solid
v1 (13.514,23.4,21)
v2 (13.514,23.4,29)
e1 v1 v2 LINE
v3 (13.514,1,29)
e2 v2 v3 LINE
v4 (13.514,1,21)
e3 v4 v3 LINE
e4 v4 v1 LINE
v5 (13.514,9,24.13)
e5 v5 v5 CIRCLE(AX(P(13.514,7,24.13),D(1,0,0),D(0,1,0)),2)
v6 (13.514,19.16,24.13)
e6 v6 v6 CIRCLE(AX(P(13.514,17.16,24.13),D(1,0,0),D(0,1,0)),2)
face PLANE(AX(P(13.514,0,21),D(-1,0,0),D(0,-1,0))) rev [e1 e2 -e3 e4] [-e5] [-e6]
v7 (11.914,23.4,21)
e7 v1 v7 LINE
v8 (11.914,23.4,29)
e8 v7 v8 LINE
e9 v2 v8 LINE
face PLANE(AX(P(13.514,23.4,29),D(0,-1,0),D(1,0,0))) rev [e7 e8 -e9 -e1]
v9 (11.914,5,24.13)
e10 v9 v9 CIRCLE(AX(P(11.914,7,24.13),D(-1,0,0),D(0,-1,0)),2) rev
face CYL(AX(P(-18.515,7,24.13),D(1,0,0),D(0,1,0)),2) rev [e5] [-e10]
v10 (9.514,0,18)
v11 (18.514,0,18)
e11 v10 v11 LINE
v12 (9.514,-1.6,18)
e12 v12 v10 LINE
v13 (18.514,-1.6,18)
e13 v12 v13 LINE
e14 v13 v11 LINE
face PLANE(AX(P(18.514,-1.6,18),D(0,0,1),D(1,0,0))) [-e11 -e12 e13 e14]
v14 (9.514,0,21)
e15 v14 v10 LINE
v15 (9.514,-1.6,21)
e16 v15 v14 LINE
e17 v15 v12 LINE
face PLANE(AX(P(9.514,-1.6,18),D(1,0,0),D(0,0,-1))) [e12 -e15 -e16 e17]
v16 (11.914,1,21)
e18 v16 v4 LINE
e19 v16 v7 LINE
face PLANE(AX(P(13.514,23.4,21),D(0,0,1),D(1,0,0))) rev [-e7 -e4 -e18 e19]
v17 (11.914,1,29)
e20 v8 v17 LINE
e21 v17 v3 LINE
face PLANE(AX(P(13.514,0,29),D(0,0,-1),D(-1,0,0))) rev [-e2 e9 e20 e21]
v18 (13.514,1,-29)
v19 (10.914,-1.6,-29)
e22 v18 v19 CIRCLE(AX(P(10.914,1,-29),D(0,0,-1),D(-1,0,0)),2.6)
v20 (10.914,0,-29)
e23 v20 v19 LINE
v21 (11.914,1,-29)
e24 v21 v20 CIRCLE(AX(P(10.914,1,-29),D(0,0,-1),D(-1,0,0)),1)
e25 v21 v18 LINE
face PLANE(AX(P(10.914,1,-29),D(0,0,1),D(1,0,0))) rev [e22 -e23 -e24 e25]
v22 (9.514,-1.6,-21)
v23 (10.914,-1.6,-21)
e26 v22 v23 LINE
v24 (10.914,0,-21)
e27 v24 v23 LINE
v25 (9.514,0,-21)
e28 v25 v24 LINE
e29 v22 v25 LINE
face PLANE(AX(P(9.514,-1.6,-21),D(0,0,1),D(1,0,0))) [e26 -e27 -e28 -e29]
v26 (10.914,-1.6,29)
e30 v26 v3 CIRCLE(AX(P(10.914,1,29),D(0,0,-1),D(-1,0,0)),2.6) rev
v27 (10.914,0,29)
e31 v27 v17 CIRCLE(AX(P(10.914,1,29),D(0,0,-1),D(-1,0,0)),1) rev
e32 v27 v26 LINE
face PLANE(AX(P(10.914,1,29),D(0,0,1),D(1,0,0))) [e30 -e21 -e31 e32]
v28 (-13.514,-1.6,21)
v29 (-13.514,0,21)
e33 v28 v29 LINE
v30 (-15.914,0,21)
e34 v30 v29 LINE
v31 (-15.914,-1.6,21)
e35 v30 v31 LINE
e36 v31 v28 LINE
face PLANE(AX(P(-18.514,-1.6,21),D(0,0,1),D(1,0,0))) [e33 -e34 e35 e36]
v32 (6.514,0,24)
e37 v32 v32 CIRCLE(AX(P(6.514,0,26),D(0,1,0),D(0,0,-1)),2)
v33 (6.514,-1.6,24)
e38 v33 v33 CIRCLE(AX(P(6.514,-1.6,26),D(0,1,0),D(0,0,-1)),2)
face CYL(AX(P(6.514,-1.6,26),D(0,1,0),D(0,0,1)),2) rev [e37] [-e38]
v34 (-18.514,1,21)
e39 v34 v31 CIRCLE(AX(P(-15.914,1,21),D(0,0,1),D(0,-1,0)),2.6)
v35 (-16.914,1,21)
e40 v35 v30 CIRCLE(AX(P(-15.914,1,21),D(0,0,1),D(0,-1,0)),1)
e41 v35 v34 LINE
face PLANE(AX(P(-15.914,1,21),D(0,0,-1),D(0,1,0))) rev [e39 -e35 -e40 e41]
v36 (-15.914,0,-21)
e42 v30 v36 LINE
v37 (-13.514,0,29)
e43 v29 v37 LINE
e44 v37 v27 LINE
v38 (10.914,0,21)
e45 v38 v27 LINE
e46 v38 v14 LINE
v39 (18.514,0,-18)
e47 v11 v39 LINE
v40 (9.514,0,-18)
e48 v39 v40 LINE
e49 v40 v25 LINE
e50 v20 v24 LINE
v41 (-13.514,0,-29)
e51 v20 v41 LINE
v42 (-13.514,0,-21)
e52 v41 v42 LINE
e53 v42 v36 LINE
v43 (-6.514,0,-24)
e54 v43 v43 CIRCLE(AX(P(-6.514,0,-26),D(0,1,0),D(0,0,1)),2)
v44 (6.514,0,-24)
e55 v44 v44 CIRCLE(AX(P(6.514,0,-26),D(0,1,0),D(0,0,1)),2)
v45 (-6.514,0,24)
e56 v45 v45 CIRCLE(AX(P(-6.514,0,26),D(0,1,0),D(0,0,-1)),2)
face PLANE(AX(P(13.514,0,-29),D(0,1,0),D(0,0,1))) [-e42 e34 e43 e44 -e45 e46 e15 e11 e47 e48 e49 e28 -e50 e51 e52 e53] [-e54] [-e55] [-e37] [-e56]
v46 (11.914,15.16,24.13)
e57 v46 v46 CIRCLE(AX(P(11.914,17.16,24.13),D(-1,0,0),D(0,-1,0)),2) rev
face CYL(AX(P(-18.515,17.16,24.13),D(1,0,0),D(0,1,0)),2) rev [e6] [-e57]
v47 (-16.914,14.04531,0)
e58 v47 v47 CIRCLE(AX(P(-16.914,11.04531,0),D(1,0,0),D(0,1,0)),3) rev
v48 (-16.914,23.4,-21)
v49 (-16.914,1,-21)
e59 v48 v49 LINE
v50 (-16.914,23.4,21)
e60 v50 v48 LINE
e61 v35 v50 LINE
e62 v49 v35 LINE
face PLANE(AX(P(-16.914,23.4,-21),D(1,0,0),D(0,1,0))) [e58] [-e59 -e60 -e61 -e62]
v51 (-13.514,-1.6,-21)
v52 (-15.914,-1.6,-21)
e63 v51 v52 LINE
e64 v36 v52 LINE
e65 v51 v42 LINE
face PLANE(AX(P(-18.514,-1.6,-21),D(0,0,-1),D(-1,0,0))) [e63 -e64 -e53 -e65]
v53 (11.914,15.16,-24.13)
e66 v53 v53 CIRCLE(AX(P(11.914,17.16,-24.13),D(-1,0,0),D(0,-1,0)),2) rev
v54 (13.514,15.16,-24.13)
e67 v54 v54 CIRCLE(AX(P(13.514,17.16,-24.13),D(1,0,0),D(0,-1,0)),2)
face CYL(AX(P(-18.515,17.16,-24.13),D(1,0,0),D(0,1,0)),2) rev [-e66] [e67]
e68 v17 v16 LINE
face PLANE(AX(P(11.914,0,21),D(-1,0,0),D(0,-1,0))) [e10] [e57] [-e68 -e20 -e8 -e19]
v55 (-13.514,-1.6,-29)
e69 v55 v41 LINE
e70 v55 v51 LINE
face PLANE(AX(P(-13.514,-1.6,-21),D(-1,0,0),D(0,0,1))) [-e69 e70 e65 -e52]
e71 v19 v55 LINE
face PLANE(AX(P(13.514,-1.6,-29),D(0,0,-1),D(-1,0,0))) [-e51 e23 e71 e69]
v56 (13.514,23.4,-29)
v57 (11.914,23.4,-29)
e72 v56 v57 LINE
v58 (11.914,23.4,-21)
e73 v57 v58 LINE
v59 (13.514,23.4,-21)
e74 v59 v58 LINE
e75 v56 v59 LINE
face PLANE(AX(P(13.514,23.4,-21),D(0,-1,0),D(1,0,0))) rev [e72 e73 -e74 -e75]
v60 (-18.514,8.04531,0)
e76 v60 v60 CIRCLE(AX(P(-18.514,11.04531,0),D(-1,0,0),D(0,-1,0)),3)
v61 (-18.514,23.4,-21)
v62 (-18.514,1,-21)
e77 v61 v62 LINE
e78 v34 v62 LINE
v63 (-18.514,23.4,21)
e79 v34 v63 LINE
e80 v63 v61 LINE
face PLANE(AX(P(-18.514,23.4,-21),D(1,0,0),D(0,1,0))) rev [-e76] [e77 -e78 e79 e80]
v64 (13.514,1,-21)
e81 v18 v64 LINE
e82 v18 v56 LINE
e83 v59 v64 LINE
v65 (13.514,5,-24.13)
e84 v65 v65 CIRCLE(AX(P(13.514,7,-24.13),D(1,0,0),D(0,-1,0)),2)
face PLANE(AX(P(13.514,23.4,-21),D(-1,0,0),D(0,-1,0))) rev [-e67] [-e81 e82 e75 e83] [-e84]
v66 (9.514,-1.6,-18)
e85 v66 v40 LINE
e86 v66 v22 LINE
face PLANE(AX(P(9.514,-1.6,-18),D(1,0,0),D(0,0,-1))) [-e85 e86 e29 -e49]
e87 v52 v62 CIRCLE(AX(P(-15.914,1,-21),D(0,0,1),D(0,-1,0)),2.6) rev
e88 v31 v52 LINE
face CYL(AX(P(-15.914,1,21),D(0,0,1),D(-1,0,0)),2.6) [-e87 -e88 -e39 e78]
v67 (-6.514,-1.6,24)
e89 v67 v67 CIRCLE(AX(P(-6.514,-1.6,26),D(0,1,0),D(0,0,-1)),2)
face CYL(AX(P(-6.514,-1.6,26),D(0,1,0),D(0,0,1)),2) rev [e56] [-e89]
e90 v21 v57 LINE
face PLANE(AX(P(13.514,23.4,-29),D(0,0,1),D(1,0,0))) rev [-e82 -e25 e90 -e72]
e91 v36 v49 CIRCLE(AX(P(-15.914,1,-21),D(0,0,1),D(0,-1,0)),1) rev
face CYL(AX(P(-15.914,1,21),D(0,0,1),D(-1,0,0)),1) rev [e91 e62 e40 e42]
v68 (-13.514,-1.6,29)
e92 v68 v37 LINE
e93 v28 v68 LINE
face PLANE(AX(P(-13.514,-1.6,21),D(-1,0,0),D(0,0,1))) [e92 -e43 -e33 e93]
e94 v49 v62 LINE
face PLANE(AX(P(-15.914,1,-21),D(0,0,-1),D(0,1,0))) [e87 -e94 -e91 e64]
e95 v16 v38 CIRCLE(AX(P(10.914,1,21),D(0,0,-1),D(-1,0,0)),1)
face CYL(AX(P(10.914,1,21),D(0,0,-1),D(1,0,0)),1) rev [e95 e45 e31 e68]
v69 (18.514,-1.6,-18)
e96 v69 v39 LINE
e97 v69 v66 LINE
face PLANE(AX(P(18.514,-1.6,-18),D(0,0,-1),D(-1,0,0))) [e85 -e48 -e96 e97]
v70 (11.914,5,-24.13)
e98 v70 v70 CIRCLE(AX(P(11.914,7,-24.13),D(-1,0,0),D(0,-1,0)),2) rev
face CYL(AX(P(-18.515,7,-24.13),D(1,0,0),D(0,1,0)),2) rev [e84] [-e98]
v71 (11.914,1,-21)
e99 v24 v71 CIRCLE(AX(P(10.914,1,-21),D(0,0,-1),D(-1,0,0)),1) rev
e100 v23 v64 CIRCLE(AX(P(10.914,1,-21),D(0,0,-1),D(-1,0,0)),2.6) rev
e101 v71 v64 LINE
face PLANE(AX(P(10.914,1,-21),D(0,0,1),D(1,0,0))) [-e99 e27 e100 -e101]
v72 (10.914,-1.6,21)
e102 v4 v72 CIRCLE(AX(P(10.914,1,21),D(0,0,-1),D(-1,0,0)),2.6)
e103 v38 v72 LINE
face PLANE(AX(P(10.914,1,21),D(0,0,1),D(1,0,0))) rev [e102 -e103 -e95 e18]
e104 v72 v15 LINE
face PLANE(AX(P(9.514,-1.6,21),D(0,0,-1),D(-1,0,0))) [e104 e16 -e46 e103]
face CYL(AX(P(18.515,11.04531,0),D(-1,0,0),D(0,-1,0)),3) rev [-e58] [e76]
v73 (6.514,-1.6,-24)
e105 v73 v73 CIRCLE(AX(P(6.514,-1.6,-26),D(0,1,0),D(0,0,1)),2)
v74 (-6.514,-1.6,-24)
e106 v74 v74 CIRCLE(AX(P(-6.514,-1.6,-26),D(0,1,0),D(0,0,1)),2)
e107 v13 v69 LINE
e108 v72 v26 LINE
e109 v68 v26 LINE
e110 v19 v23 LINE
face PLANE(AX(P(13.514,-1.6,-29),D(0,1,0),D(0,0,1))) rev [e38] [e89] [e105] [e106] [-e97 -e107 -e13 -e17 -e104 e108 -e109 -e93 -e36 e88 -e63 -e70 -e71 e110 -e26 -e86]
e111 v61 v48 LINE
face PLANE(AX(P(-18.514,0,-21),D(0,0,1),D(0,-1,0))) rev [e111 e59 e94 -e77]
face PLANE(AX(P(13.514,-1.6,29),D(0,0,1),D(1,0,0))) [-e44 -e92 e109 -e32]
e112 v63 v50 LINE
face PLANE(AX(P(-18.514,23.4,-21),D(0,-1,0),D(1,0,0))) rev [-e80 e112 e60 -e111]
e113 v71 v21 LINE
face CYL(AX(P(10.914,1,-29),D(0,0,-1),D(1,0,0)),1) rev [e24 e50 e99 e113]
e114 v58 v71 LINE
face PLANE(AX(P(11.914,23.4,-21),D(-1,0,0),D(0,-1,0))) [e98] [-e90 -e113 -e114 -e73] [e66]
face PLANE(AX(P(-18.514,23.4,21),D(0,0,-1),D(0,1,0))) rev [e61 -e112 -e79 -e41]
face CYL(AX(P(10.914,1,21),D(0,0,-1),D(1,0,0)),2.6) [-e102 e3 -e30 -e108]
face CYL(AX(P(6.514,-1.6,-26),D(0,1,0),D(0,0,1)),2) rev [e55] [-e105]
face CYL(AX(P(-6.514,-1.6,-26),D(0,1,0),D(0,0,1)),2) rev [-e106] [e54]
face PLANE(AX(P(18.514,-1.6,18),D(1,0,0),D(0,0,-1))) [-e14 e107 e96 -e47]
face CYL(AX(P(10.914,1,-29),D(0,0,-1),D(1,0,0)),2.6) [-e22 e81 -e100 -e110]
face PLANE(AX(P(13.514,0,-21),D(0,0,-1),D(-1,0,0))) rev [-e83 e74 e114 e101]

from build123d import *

# Parameters (mm, degrees)
SKETCH1_R                      = 2
BASE_FLANGE1_DEPTH             = 1.6
EDGE_FLANGE1_STRIP_W           = 8.4
EDGE_FLANGE1_STRIP_H           = 1.6
EDGE_FLANGE1_STRIP_CUT_DEPTH   = 8
EDGE_FLANGE1_STRIP_2_W         = 8.4
EDGE_FLANGE1_STRIP_2_H         = 1.6
EDGE_FLANGE1_STRIP_CUT_2_DEPTH = 8
EDGE_FLANGE1_STRIP_3_W         = 8.4
EDGE_FLANGE1_STRIP_3_H         = 1.6
EDGE_FLANGE1_STRIP_CUT_3_DEPTH = 42
EDGE_FLANGE1_DEPTH             = 8
EDGE_FLANGE1_BEND_DEPTH        = 8
EDGE_FLANGE1_BEND_2_DEPTH      = 42
CUT_EXTRUDE1_REACH             = 54.532
SKETCH14_R                     = 3
CUT_EXTRUDE2_REACH             = 51.136
SKETCH15_R                     = 2


# Sheet-metal steps are written as plain solids
with BuildPart() as part:
    # Sketch1 → Base-Flange1 (new body)
    with BuildSketch(Plane(origin=(0, 0, 0), x_dir=(1, 0, 0), z_dir=(0, 1, 0))):
        Polygon((-18.514, 21), (-13.514, 21), (-13.514, 29), (13.514, 29), (13.514, 21), (9.514, 21), (9.514, 18), (18.514, 18), (18.514, -18), (9.514, -18), (9.514, -21), (13.514, -21), (13.514, -29), (-13.514, -29), (-13.514, -21), (-18.514, -21), align=None)
        with Locations(Location((-6.514, 26, 0), (0, 0, 270))):
            Circle(SKETCH1_R, mode=Mode.SUBTRACT)
        with Locations(Location((6.514, 26, 0), (0, 0, 270))):
            Circle(SKETCH1_R, mode=Mode.SUBTRACT)
        with Locations(Location((6.514, -26, 0), (0, 0, 90))):
            Circle(SKETCH1_R, mode=Mode.SUBTRACT)
        with Locations(Location((-6.514, -26, 0), (0, 0, 90))):
            Circle(SKETCH1_R, mode=Mode.SUBTRACT)
    extrude(amount=-BASE_FLANGE1_DEPTH)

    # Edge-Flange1 strip (across the edge) → Edge-Flange1 strip cut (cut)
    with BuildSketch(Plane(origin=(13.514, 0, 29), x_dir=(-1, 0, 0), z_dir=(0, 0, -1))):
        with Locations((-1.6, -0.8)):
            Rectangle(EDGE_FLANGE1_STRIP_W, EDGE_FLANGE1_STRIP_H)
    extrude(amount=EDGE_FLANGE1_STRIP_CUT_DEPTH, mode=Mode.SUBTRACT)

    # Edge-Flange1 strip 2 (across the edge) → Edge-Flange1 strip cut 2 (cut)
    with BuildSketch(Plane(origin=(13.514, 0, -21), x_dir=(-1, 0, 0), z_dir=(0, 0, -1))):
        with Locations((-1.6, -0.8)):
            Rectangle(EDGE_FLANGE1_STRIP_2_W, EDGE_FLANGE1_STRIP_2_H)
    extrude(amount=EDGE_FLANGE1_STRIP_CUT_2_DEPTH, mode=Mode.SUBTRACT)

    # Edge-Flange1 strip 3 (across the edge) → Edge-Flange1 strip cut 3 (cut)
    with BuildSketch(Plane(origin=(-18.514, 0, -21), x_dir=(1, 0, 0), z_dir=(0, 0, 1))):
        with Locations((-1.6, -0.8)):
            Rectangle(EDGE_FLANGE1_STRIP_3_W, EDGE_FLANGE1_STRIP_3_H)
    extrude(amount=EDGE_FLANGE1_STRIP_CUT_3_DEPTH, mode=Mode.SUBTRACT)

    # Edge-Flange1 section (across the edge) → Edge-Flange1 (add)
    with BuildSketch(Plane(origin=(13.514, 0, 29), x_dir=(-1, 0, 0), z_dir=(0, 0, -1))):
        with BuildLine():
            Line((0, 1), (0, 23.4))
            Line((0, 23.4), (1.6, 23.4))
            Line((1.6, 23.4), (1.6, 1))
            ThreePointArc((1.6, 1), (1.892893219, 0.292893219), (2.6, 0))
            Line((2.6, 0), (2.6, -1.6))
            ThreePointArc((2.6, -1.6), (0.761522369, -0.838477631), (0, 1))
        make_face()
    extrude(amount=EDGE_FLANGE1_DEPTH)

    # Edge-Flange1 section 2 (across the edge) → Edge-Flange1 bend (add)
    with BuildSketch(Plane(origin=(13.514, 0, -21), x_dir=(-1, 0, 0), z_dir=(0, 0, -1))):
        with BuildLine():
            Line((0, 1), (0, 23.4))
            Line((0, 23.4), (1.6, 23.4))
            Line((1.6, 23.4), (1.6, 1))
            ThreePointArc((1.6, 1), (1.892893219, 0.292893219), (2.6, 0))
            Line((2.6, 0), (2.6, -1.6))
            ThreePointArc((2.6, -1.6), (0.761522369, -0.838477631), (0, 1))
        make_face()
    extrude(amount=EDGE_FLANGE1_BEND_DEPTH)

    # Edge-Flange1 section 3 (across the edge) → Edge-Flange1 bend 2 (add)
    with BuildSketch(Plane(origin=(-18.514, 0, -21), x_dir=(1, 0, 0), z_dir=(0, 0, 1))):
        with BuildLine():
            Line((0, 1), (0, 23.4))
            Line((0, 23.4), (1.6, 23.4))
            Line((1.6, 23.4), (1.6, 1))
            ThreePointArc((1.6, 1), (1.892893219, 0.292893219), (2.6, 0))
            Line((2.6, 0), (2.6, -1.6))
            ThreePointArc((2.6, -1.6), (0.761522369, -0.838477631), (0, 1))
        make_face()
    extrude(amount=EDGE_FLANGE1_BEND_2_DEPTH)

    # Sketch14 → Cut-Extrude1 (cut, up to next)
    with BuildSketch(Plane.ZY.offset(18.514), mode=Mode.PRIVATE) as cut_extrude1_sk1:
        with Locations(Location((0, 11.045309813, 0), (0, 0, 270))):
            Circle(SKETCH14_R)
    cut_extrude1_tool1 = extrude(cut_extrude1_sk1.sketch, amount=-CUT_EXTRUDE1_REACH, mode=Mode.PRIVATE) & part.part
    add(cut_extrude1_tool1.solids().sort_by_distance((-18.514, 11.04531, 0))[0], mode=Mode.SUBTRACT)

    # Sketch15 → Cut-Extrude2 (cut, up to next)
    with BuildSketch(Plane(origin=(13.514, 0, 0), x_dir=(0, 0, -1), z_dir=(1, 0, 0)), mode=Mode.PRIVATE) as cut_extrude2_sk1:
        with Locations(Location((-24.13, 7, 0), (0, 0, 90))):
            Circle(SKETCH15_R)
    cut_extrude2_tool1 = extrude(cut_extrude2_sk1.sketch, amount=-CUT_EXTRUDE2_REACH, mode=Mode.PRIVATE) & part.part
    # Sketch15 → Cut-Extrude2 (cut, up to next)
    with BuildSketch(Plane(origin=(13.514, 0, 0), x_dir=(0, 0, -1), z_dir=(1, 0, 0)), mode=Mode.PRIVATE) as cut_extrude2_sk2:
        with Locations(Location((-24.13, 17.16, 0), (0, 0, 90))):
            Circle(SKETCH15_R)
    cut_extrude2_tool2 = extrude(cut_extrude2_sk2.sketch, amount=-CUT_EXTRUDE2_REACH, mode=Mode.PRIVATE) & part.part
    # Sketch15 → Cut-Extrude2 (cut, up to next)
    with BuildSketch(Plane(origin=(13.514, 0, 0), x_dir=(0, 0, -1), z_dir=(1, 0, 0)), mode=Mode.PRIVATE) as cut_extrude2_sk3:
        with Locations(Location((24.13, 7, 0), (0, 0, 270))):
            Circle(SKETCH15_R)
    cut_extrude2_tool3 = extrude(cut_extrude2_sk3.sketch, amount=-CUT_EXTRUDE2_REACH, mode=Mode.PRIVATE) & part.part
    # Sketch15 → Cut-Extrude2 (cut, up to next)
    with BuildSketch(Plane(origin=(13.514, 0, 0), x_dir=(0, 0, -1), z_dir=(1, 0, 0)), mode=Mode.PRIVATE) as cut_extrude2_sk4:
        with Locations(Location((24.13, 17.16, 0), (0, 0, 270))):
            Circle(SKETCH15_R)
    cut_extrude2_tool4 = extrude(cut_extrude2_sk4.sketch, amount=-CUT_EXTRUDE2_REACH, mode=Mode.PRIVATE) & part.part
    add(cut_extrude2_tool1.solids().sort_by_distance((13.514, 7, 24.13))[0], mode=Mode.SUBTRACT)
    add(cut_extrude2_tool2.solids().sort_by_distance((13.514, 17.16, 24.13))[0], mode=Mode.SUBTRACT)
    add(cut_extrude2_tool3.solids().sort_by_distance((13.514, 7, -24.13))[0], mode=Mode.SUBTRACT)
    add(cut_extrude2_tool4.solids().sort_by_distance((13.514, 17.16, -24.13))[0], mode=Mode.SUBTRACT)


solid = part.part
